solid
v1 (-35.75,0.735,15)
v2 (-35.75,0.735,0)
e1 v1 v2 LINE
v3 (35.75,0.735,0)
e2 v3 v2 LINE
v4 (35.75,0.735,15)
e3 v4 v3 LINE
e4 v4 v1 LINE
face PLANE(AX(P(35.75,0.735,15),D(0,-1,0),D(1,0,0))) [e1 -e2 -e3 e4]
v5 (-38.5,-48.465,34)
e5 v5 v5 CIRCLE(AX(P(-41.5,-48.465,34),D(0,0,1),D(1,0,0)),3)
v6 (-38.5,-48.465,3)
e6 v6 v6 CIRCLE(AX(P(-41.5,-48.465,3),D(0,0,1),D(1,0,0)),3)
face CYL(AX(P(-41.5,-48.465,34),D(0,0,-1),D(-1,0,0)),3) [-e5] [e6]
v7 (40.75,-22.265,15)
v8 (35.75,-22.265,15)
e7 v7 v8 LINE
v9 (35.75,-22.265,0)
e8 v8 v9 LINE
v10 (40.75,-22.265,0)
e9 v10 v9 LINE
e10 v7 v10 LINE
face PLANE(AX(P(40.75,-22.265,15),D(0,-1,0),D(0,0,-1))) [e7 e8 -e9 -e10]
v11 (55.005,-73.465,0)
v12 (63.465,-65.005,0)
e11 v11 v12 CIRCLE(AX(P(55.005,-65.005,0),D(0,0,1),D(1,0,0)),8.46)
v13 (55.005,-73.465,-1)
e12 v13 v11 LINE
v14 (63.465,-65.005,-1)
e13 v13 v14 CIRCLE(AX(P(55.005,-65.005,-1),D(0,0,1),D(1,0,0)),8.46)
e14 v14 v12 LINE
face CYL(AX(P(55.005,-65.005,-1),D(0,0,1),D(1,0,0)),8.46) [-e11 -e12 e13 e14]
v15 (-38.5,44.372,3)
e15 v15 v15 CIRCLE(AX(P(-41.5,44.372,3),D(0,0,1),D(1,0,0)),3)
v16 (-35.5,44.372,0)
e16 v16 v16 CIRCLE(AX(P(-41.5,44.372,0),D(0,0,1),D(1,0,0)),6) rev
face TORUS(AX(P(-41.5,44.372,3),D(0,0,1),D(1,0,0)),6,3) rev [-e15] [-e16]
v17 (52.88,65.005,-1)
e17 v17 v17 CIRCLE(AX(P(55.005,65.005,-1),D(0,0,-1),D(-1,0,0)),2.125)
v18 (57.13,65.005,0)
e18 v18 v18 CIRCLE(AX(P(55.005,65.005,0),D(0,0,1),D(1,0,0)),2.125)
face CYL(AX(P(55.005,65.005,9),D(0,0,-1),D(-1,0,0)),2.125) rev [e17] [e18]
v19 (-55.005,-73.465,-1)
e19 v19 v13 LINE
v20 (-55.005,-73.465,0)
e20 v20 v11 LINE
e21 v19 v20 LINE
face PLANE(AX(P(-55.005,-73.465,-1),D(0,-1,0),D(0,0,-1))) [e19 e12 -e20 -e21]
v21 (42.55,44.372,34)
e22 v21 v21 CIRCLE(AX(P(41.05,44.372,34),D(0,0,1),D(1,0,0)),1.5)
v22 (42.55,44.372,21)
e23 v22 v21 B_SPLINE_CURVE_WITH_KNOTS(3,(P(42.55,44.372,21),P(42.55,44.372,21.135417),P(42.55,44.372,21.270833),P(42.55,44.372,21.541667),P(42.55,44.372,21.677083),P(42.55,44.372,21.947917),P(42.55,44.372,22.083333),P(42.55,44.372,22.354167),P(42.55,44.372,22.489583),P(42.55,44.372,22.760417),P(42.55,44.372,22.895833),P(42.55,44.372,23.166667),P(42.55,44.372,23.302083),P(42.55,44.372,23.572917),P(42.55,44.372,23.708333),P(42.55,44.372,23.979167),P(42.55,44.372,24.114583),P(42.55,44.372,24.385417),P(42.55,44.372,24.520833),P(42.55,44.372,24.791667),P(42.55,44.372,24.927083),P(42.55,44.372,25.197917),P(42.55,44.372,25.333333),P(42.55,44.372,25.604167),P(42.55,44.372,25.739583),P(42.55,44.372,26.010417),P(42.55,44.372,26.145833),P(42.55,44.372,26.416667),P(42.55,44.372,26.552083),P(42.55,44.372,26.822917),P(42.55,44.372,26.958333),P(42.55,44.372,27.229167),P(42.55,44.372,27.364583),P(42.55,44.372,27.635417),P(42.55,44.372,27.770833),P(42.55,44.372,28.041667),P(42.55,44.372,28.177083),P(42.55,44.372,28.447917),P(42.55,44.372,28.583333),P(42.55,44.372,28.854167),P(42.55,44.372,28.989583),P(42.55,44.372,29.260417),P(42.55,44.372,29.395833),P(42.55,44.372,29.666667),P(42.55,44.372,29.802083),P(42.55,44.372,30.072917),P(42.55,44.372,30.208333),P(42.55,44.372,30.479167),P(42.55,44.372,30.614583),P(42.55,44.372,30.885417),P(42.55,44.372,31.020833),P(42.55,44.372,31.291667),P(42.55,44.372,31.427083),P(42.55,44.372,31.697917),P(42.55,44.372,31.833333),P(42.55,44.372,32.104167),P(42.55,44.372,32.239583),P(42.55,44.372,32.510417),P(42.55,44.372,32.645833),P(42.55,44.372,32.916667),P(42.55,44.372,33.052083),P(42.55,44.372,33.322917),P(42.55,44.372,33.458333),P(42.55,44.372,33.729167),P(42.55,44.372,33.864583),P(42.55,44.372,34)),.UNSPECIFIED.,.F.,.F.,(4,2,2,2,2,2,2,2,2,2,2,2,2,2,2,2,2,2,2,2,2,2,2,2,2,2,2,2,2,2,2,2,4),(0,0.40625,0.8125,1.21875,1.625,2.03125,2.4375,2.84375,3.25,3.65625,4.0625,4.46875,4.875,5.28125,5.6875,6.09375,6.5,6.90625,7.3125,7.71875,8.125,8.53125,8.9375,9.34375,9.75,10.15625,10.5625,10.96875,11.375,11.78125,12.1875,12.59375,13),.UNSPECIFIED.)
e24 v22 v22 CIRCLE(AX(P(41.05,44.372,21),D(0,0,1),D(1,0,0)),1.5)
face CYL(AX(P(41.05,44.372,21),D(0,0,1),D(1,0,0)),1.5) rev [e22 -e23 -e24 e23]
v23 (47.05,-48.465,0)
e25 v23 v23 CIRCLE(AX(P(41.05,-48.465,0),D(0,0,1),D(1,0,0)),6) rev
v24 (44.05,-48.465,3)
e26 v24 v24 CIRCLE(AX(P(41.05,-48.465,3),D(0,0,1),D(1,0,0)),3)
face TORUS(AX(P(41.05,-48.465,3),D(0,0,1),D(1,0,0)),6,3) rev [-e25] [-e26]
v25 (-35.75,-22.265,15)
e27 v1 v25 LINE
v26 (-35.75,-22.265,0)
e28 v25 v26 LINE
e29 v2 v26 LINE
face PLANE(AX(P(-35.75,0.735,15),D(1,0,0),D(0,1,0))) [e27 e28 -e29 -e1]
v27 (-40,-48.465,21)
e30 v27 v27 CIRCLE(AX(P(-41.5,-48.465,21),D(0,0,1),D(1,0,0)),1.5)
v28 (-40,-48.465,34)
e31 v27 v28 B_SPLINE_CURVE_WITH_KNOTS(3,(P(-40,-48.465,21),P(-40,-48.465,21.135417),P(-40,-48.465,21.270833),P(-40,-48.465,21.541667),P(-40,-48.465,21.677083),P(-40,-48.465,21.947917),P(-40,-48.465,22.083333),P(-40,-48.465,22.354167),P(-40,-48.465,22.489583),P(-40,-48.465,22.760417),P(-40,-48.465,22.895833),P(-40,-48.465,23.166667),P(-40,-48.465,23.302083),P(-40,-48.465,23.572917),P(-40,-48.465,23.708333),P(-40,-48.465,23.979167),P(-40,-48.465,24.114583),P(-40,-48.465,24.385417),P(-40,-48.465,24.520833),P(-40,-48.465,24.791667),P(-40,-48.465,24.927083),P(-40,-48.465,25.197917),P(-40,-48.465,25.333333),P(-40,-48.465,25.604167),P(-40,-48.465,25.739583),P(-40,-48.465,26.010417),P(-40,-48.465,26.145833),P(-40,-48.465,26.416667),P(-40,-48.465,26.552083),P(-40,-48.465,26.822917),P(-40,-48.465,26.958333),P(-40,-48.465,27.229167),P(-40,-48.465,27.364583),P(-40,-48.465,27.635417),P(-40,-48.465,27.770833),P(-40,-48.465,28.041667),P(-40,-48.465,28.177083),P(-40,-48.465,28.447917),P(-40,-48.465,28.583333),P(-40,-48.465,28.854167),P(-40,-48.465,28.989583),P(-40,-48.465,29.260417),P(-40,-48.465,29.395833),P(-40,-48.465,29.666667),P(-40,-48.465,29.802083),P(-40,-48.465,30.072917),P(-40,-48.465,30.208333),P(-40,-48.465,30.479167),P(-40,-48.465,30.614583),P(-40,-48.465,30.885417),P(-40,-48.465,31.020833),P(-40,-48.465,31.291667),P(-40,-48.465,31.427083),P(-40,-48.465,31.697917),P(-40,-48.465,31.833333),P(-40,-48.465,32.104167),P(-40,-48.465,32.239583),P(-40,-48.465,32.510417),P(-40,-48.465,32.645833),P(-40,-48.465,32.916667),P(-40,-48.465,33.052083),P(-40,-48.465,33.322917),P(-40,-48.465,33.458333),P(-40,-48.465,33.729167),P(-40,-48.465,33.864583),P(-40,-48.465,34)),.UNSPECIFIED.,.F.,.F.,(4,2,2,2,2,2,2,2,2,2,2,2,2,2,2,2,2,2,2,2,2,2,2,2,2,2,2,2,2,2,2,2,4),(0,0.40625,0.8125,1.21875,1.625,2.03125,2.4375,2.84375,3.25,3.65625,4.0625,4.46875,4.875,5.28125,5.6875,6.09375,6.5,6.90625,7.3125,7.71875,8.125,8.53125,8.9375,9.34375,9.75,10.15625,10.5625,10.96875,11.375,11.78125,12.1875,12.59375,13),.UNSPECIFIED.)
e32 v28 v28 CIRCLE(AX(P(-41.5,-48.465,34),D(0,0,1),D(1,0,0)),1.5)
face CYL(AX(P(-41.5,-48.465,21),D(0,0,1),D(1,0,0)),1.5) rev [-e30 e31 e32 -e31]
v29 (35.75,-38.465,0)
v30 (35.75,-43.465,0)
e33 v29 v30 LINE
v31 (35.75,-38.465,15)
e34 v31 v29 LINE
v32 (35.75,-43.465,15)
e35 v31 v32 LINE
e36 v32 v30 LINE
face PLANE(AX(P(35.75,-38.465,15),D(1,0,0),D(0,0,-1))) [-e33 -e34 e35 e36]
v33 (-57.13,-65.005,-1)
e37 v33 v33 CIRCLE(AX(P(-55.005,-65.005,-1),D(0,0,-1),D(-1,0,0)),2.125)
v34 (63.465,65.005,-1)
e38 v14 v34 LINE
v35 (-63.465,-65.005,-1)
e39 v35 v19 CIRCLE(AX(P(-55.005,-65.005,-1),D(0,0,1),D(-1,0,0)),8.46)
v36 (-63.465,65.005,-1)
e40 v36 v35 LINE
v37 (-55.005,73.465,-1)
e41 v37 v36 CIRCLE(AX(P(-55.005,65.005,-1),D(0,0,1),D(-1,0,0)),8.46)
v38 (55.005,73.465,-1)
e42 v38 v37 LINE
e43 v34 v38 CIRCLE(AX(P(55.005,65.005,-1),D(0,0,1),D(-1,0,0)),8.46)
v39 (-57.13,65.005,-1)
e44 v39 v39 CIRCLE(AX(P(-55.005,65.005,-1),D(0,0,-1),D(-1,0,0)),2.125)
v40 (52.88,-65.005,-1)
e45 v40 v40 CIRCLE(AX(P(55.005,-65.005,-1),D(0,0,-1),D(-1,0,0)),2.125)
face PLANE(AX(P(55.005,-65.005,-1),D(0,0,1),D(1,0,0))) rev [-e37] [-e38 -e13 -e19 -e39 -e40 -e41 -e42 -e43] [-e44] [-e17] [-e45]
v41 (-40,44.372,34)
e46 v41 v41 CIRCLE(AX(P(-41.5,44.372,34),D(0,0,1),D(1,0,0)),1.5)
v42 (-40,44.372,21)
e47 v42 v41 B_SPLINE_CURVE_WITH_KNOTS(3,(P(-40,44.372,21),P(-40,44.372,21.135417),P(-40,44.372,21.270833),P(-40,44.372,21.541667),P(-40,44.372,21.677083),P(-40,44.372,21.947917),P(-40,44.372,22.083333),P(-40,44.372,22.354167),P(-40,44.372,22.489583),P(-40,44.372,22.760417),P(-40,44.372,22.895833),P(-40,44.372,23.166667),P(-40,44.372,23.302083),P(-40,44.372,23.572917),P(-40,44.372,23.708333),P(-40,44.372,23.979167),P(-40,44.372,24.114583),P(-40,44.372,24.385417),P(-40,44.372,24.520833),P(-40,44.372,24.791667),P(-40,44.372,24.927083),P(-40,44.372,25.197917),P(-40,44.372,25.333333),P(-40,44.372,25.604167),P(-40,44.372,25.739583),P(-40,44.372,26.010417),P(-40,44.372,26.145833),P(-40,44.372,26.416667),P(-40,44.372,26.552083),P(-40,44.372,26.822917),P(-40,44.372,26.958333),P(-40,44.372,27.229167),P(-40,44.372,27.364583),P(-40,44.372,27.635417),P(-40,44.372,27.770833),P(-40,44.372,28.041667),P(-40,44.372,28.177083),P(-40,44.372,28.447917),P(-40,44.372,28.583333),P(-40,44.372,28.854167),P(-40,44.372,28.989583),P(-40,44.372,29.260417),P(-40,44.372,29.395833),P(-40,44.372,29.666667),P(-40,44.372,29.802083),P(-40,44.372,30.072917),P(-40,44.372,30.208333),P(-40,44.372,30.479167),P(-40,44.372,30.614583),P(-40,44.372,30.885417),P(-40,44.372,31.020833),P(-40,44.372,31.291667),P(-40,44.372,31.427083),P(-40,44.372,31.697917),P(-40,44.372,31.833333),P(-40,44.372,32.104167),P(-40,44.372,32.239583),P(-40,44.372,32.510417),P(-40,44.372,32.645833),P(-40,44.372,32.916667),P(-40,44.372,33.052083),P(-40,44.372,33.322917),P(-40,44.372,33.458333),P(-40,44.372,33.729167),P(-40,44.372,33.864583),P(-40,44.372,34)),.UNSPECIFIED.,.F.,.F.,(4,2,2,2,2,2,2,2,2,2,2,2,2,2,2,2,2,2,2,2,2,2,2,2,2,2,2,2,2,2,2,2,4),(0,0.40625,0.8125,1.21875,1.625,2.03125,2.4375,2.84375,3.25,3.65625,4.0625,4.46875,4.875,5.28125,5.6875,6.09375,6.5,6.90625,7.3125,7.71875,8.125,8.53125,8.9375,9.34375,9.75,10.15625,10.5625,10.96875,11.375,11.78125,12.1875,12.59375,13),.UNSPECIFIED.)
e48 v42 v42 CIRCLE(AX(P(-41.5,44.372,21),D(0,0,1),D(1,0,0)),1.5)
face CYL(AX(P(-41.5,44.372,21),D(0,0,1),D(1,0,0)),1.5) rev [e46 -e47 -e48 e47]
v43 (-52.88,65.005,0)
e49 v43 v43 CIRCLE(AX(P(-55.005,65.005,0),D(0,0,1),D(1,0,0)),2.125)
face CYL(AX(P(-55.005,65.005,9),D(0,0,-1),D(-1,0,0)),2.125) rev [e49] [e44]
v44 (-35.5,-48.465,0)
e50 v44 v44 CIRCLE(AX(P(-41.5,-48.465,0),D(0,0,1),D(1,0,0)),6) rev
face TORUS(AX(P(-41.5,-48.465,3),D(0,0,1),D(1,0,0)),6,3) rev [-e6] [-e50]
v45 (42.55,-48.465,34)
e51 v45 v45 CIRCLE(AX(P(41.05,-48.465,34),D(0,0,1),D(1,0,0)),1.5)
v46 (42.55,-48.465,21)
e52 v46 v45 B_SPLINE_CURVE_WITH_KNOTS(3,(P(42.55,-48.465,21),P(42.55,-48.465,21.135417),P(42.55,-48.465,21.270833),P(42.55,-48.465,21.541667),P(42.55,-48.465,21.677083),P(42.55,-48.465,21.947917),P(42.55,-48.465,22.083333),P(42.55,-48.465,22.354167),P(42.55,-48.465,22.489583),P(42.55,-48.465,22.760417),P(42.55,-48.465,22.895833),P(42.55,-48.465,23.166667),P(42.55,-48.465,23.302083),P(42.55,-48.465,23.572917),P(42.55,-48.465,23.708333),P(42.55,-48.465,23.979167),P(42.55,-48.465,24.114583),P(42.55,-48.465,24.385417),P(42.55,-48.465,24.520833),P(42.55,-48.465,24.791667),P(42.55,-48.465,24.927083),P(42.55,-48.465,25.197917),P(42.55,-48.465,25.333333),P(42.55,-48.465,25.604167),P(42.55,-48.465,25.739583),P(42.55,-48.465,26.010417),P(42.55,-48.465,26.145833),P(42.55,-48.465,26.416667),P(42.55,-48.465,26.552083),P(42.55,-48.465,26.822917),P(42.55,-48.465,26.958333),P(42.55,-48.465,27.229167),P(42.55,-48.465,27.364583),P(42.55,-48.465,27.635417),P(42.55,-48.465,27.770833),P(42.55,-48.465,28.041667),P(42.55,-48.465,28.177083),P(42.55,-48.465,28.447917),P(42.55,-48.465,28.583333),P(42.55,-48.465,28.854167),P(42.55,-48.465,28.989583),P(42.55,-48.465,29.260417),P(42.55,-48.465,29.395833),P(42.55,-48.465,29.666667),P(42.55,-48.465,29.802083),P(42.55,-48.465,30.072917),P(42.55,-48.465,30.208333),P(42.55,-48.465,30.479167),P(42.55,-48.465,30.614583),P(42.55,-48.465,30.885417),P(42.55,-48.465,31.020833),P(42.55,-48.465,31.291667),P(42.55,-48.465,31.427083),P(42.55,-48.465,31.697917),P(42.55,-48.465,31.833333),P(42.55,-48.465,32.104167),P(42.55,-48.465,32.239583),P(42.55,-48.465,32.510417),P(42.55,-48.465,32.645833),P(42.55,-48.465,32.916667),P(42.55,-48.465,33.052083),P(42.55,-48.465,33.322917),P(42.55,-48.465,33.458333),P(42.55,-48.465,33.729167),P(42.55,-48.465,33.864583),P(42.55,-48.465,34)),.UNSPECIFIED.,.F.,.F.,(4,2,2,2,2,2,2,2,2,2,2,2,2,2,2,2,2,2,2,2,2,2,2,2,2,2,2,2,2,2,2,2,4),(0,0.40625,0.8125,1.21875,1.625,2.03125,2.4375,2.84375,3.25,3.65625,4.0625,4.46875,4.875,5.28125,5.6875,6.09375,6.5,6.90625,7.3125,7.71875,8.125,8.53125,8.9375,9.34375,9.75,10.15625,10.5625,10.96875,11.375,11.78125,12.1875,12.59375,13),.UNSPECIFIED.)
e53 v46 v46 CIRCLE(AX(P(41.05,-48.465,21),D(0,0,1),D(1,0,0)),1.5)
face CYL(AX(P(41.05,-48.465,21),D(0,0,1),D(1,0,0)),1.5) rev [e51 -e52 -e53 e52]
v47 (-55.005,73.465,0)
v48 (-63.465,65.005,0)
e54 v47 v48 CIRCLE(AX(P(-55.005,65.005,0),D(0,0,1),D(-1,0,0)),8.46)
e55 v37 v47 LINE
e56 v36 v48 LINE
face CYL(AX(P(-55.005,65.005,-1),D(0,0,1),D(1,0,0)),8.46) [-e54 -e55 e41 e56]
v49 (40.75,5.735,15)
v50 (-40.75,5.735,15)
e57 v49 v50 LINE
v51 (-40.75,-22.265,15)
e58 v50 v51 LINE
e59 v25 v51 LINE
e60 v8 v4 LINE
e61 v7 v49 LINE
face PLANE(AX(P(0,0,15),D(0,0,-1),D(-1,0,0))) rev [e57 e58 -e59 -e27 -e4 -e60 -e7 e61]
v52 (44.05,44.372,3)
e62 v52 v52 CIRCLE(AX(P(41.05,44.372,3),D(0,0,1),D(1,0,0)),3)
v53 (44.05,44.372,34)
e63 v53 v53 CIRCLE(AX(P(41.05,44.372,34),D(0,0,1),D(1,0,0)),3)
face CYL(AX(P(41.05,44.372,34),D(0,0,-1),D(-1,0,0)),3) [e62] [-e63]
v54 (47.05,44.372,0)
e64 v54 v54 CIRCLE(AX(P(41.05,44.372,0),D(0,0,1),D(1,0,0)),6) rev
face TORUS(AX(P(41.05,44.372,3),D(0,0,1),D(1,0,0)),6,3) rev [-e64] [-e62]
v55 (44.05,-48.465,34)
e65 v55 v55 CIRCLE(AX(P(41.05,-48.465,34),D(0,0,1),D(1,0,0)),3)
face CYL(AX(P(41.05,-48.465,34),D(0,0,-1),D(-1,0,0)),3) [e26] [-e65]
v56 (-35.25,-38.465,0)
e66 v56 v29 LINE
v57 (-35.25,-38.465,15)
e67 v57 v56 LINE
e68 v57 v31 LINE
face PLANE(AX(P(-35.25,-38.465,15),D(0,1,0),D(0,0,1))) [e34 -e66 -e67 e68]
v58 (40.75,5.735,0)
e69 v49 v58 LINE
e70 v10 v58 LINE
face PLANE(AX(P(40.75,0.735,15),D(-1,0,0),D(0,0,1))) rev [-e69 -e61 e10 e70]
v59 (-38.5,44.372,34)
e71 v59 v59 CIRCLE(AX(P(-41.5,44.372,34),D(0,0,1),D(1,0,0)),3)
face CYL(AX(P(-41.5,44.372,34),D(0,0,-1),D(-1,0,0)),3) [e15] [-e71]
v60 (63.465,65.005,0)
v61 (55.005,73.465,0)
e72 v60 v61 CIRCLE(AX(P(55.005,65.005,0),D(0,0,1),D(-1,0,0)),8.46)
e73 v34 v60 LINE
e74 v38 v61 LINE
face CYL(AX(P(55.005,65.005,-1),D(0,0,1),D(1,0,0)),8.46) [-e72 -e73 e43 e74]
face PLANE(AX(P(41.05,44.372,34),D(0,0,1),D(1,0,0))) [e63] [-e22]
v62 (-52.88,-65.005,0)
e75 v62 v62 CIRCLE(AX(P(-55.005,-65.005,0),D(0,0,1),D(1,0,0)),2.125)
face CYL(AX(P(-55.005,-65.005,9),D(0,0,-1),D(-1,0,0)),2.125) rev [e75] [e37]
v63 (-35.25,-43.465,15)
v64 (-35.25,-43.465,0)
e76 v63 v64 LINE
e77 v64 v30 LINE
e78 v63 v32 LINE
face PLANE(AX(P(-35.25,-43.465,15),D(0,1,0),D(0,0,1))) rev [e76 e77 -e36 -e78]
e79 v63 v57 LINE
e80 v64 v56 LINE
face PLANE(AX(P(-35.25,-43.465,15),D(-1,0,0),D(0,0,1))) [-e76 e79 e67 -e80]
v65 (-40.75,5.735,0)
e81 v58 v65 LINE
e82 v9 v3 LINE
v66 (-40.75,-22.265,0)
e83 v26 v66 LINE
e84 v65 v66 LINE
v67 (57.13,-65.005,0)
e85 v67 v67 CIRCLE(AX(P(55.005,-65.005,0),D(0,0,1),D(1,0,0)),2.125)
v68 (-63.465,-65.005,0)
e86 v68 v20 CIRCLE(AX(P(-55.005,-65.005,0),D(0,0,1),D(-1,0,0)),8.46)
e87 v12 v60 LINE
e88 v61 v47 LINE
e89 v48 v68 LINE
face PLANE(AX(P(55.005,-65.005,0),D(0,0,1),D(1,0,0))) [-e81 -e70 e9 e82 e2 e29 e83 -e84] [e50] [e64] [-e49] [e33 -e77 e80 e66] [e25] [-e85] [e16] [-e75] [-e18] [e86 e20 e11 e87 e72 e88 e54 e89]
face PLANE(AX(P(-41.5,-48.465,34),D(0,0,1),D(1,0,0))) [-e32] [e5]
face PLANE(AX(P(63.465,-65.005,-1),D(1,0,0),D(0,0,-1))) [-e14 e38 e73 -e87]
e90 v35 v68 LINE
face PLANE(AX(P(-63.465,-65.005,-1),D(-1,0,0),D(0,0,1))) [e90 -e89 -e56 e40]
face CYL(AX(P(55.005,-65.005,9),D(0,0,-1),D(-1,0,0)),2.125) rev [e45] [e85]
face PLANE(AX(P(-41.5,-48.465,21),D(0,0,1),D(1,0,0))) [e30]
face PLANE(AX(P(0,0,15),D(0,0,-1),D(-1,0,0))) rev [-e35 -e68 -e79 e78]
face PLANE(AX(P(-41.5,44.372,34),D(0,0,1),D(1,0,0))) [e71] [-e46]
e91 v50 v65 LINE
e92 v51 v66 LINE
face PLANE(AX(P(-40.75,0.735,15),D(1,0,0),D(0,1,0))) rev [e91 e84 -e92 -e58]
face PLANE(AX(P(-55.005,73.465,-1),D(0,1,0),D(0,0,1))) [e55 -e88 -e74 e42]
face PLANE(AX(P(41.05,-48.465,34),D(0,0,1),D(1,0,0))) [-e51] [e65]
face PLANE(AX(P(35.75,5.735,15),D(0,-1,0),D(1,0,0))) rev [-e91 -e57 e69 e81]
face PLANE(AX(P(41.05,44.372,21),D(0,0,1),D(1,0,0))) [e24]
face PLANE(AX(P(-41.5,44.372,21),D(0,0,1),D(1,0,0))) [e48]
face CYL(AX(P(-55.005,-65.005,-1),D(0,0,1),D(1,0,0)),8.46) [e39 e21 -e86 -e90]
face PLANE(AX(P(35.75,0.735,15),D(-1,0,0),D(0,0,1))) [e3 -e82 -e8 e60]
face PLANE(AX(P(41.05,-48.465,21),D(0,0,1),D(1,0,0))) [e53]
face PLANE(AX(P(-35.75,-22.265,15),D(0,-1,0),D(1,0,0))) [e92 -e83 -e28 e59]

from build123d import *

# Parameters (mm, degrees)
BASE_FLANGE1_DEPTH      = 1
SKETCH7_R               = 2.125
CUT_EXTRUDE1_DEPTH      = 10
SKETCH8_R               = 3
BOSS_EXTRUDE3_DEPTH     = 34
EXTRUDE_THIN1_OUTLINE_W = 71
EXTRUDE_THIN1_OUTLINE_H = 5
EXTRUDE_THIN1_DEPTH     = 15
SKETCH17_R              = 1.5
CUT_EXTRUDE3_DEPTH      = 13
SKETCH15_R              = 1.5
CUT_EXTRUDE4_DEPTH      = 13
SKETCH13_R              = 1.5
CUT_EXTRUDE5_DEPTH      = 13
SKETCH14_R              = 1.5
CUT_EXTRUDE6_DEPTH      = 13
FILLET1_R               = 3
FILLET2_R               = 3
FILLET3_R               = 3
FILLET4_R               = 3


# Read off the part's stored shape, not the designer's step: Extrude-Thin1
# Sheet-metal steps are written as plain solids
with BuildPart() as part:
    # Sketch1 → Base-Flange1 (new body)
    with BuildSketch(Plane.XY):
        with BuildLine():
            Line((-55.005, -73.465), (55.005, -73.465))
            ThreePointArc((55.005, -73.465), (60.987123369, -70.987123369), (63.465, -65.005))
            Line((63.465, -65.005), (63.465, 65.005))
            ThreePointArc((63.465, 65.005), (60.987123369, 70.987123369), (55.005, 73.465))
            Line((55.005, 73.465), (-55.005, 73.465))
            ThreePointArc((-55.005, 73.465), (-60.987123369, 70.987123369), (-63.465, 65.005))
            Line((-63.465, 65.005), (-63.465, -65.005))
            ThreePointArc((-63.465, -65.005), (-60.987123369, -70.987123369), (-55.005, -73.465))
        make_face()
    extrude(amount=-BASE_FLANGE1_DEPTH)

    # Sketch7 → Cut-Extrude1 (cut)
    with BuildSketch(Plane(origin=(0, 0, -1), x_dir=(-1, 0, 0), z_dir=(0, 0, -1))):
        with Locations((55.005, 65.005)):
            Circle(SKETCH7_R)
        with Locations((-55.005, 65.005)):
            Circle(SKETCH7_R)
        with Locations((55.005, -65.005)):
            Circle(SKETCH7_R)
        with Locations((-55.005, -65.005)):
            Circle(SKETCH7_R)
    extrude(amount=-CUT_EXTRUDE1_DEPTH, mode=Mode.SUBTRACT)

    # Sketch8 → Boss-Extrude3 (add)
    with BuildSketch(Plane.XY):
        with Locations((-41.5, -48.465)):
            Circle(SKETCH8_R)
        with Locations((-41.5, 44.372)):
            Circle(SKETCH8_R)
        with Locations((41.05, -48.465)):
            Circle(SKETCH8_R)
        with Locations((41.05, 44.372)):
            Circle(SKETCH8_R)
    extrude(amount=BOSS_EXTRUDE3_DEPTH)

    # Extrude-Thin1 outline → Extrude-Thin1 (add)
    with BuildSketch(Plane.XY):
        with Locations((0.25, -40.965)):
            Rectangle(EXTRUDE_THIN1_OUTLINE_W, EXTRUDE_THIN1_OUTLINE_H)
        Polygon((-40.75, 5.735), (-40.75, -22.265), (-35.75, -22.265), (-35.75, 0.735), (35.75, 0.735), (35.75, -22.265), (40.75, -22.265), (40.75, 5.735), align=None)
    extrude(amount=EXTRUDE_THIN1_DEPTH)

    # Sketch17 → Cut-Extrude3 (cut)
    with BuildSketch(Plane.XY.offset(34)):
        with Locations((41.05, -48.465)):
            Circle(SKETCH17_R)
    extrude(amount=-CUT_EXTRUDE3_DEPTH, mode=Mode.SUBTRACT)

    # Sketch15 → Cut-Extrude4 (cut)
    with BuildSketch(Plane.XY.offset(34)):
        with Locations((-41.5, -48.465)):
            Circle(SKETCH15_R)
    extrude(amount=-CUT_EXTRUDE4_DEPTH, mode=Mode.SUBTRACT)

    # Sketch13 → Cut-Extrude5 (cut)
    with BuildSketch(Plane.XY.offset(34)):
        with Locations((-41.5, 44.372)):
            Circle(SKETCH13_R)
    extrude(amount=-CUT_EXTRUDE5_DEPTH, mode=Mode.SUBTRACT)

    # Sketch14 → Cut-Extrude6 (cut)
    with BuildSketch(Plane.XY.offset(34)):
        with Locations((41.05, 44.372)):
            Circle(SKETCH14_R)
    extrude(amount=-CUT_EXTRUDE6_DEPTH, mode=Mode.SUBTRACT)

    # Fillet1
    fillet1_edges = [part.edges().sort_by_distance(p)[0] for p in [
        (-44.5, -48.465, 0),
    ]]
    fillet(fillet1_edges, radius=FILLET1_R)

    # Fillet2
    fillet2_edges = [part.edges().sort_by_distance(p)[0] for p in [
        (38.05, -48.465, 0),
    ]]
    fillet(fillet2_edges, radius=FILLET2_R)

    # Fillet3
    fillet3_edges = [part.edges().sort_by_distance(p)[0] for p in [
        (-44.5, 44.372, 0),
    ]]
    fillet(fillet3_edges, radius=FILLET3_R)

    # Fillet4
    fillet4_edges = [part.edges().sort_by_distance(p)[0] for p in [
        (38.05, 44.372, 0),
    ]]
    fillet(fillet4_edges, radius=FILLET4_R)


solid = part.part
